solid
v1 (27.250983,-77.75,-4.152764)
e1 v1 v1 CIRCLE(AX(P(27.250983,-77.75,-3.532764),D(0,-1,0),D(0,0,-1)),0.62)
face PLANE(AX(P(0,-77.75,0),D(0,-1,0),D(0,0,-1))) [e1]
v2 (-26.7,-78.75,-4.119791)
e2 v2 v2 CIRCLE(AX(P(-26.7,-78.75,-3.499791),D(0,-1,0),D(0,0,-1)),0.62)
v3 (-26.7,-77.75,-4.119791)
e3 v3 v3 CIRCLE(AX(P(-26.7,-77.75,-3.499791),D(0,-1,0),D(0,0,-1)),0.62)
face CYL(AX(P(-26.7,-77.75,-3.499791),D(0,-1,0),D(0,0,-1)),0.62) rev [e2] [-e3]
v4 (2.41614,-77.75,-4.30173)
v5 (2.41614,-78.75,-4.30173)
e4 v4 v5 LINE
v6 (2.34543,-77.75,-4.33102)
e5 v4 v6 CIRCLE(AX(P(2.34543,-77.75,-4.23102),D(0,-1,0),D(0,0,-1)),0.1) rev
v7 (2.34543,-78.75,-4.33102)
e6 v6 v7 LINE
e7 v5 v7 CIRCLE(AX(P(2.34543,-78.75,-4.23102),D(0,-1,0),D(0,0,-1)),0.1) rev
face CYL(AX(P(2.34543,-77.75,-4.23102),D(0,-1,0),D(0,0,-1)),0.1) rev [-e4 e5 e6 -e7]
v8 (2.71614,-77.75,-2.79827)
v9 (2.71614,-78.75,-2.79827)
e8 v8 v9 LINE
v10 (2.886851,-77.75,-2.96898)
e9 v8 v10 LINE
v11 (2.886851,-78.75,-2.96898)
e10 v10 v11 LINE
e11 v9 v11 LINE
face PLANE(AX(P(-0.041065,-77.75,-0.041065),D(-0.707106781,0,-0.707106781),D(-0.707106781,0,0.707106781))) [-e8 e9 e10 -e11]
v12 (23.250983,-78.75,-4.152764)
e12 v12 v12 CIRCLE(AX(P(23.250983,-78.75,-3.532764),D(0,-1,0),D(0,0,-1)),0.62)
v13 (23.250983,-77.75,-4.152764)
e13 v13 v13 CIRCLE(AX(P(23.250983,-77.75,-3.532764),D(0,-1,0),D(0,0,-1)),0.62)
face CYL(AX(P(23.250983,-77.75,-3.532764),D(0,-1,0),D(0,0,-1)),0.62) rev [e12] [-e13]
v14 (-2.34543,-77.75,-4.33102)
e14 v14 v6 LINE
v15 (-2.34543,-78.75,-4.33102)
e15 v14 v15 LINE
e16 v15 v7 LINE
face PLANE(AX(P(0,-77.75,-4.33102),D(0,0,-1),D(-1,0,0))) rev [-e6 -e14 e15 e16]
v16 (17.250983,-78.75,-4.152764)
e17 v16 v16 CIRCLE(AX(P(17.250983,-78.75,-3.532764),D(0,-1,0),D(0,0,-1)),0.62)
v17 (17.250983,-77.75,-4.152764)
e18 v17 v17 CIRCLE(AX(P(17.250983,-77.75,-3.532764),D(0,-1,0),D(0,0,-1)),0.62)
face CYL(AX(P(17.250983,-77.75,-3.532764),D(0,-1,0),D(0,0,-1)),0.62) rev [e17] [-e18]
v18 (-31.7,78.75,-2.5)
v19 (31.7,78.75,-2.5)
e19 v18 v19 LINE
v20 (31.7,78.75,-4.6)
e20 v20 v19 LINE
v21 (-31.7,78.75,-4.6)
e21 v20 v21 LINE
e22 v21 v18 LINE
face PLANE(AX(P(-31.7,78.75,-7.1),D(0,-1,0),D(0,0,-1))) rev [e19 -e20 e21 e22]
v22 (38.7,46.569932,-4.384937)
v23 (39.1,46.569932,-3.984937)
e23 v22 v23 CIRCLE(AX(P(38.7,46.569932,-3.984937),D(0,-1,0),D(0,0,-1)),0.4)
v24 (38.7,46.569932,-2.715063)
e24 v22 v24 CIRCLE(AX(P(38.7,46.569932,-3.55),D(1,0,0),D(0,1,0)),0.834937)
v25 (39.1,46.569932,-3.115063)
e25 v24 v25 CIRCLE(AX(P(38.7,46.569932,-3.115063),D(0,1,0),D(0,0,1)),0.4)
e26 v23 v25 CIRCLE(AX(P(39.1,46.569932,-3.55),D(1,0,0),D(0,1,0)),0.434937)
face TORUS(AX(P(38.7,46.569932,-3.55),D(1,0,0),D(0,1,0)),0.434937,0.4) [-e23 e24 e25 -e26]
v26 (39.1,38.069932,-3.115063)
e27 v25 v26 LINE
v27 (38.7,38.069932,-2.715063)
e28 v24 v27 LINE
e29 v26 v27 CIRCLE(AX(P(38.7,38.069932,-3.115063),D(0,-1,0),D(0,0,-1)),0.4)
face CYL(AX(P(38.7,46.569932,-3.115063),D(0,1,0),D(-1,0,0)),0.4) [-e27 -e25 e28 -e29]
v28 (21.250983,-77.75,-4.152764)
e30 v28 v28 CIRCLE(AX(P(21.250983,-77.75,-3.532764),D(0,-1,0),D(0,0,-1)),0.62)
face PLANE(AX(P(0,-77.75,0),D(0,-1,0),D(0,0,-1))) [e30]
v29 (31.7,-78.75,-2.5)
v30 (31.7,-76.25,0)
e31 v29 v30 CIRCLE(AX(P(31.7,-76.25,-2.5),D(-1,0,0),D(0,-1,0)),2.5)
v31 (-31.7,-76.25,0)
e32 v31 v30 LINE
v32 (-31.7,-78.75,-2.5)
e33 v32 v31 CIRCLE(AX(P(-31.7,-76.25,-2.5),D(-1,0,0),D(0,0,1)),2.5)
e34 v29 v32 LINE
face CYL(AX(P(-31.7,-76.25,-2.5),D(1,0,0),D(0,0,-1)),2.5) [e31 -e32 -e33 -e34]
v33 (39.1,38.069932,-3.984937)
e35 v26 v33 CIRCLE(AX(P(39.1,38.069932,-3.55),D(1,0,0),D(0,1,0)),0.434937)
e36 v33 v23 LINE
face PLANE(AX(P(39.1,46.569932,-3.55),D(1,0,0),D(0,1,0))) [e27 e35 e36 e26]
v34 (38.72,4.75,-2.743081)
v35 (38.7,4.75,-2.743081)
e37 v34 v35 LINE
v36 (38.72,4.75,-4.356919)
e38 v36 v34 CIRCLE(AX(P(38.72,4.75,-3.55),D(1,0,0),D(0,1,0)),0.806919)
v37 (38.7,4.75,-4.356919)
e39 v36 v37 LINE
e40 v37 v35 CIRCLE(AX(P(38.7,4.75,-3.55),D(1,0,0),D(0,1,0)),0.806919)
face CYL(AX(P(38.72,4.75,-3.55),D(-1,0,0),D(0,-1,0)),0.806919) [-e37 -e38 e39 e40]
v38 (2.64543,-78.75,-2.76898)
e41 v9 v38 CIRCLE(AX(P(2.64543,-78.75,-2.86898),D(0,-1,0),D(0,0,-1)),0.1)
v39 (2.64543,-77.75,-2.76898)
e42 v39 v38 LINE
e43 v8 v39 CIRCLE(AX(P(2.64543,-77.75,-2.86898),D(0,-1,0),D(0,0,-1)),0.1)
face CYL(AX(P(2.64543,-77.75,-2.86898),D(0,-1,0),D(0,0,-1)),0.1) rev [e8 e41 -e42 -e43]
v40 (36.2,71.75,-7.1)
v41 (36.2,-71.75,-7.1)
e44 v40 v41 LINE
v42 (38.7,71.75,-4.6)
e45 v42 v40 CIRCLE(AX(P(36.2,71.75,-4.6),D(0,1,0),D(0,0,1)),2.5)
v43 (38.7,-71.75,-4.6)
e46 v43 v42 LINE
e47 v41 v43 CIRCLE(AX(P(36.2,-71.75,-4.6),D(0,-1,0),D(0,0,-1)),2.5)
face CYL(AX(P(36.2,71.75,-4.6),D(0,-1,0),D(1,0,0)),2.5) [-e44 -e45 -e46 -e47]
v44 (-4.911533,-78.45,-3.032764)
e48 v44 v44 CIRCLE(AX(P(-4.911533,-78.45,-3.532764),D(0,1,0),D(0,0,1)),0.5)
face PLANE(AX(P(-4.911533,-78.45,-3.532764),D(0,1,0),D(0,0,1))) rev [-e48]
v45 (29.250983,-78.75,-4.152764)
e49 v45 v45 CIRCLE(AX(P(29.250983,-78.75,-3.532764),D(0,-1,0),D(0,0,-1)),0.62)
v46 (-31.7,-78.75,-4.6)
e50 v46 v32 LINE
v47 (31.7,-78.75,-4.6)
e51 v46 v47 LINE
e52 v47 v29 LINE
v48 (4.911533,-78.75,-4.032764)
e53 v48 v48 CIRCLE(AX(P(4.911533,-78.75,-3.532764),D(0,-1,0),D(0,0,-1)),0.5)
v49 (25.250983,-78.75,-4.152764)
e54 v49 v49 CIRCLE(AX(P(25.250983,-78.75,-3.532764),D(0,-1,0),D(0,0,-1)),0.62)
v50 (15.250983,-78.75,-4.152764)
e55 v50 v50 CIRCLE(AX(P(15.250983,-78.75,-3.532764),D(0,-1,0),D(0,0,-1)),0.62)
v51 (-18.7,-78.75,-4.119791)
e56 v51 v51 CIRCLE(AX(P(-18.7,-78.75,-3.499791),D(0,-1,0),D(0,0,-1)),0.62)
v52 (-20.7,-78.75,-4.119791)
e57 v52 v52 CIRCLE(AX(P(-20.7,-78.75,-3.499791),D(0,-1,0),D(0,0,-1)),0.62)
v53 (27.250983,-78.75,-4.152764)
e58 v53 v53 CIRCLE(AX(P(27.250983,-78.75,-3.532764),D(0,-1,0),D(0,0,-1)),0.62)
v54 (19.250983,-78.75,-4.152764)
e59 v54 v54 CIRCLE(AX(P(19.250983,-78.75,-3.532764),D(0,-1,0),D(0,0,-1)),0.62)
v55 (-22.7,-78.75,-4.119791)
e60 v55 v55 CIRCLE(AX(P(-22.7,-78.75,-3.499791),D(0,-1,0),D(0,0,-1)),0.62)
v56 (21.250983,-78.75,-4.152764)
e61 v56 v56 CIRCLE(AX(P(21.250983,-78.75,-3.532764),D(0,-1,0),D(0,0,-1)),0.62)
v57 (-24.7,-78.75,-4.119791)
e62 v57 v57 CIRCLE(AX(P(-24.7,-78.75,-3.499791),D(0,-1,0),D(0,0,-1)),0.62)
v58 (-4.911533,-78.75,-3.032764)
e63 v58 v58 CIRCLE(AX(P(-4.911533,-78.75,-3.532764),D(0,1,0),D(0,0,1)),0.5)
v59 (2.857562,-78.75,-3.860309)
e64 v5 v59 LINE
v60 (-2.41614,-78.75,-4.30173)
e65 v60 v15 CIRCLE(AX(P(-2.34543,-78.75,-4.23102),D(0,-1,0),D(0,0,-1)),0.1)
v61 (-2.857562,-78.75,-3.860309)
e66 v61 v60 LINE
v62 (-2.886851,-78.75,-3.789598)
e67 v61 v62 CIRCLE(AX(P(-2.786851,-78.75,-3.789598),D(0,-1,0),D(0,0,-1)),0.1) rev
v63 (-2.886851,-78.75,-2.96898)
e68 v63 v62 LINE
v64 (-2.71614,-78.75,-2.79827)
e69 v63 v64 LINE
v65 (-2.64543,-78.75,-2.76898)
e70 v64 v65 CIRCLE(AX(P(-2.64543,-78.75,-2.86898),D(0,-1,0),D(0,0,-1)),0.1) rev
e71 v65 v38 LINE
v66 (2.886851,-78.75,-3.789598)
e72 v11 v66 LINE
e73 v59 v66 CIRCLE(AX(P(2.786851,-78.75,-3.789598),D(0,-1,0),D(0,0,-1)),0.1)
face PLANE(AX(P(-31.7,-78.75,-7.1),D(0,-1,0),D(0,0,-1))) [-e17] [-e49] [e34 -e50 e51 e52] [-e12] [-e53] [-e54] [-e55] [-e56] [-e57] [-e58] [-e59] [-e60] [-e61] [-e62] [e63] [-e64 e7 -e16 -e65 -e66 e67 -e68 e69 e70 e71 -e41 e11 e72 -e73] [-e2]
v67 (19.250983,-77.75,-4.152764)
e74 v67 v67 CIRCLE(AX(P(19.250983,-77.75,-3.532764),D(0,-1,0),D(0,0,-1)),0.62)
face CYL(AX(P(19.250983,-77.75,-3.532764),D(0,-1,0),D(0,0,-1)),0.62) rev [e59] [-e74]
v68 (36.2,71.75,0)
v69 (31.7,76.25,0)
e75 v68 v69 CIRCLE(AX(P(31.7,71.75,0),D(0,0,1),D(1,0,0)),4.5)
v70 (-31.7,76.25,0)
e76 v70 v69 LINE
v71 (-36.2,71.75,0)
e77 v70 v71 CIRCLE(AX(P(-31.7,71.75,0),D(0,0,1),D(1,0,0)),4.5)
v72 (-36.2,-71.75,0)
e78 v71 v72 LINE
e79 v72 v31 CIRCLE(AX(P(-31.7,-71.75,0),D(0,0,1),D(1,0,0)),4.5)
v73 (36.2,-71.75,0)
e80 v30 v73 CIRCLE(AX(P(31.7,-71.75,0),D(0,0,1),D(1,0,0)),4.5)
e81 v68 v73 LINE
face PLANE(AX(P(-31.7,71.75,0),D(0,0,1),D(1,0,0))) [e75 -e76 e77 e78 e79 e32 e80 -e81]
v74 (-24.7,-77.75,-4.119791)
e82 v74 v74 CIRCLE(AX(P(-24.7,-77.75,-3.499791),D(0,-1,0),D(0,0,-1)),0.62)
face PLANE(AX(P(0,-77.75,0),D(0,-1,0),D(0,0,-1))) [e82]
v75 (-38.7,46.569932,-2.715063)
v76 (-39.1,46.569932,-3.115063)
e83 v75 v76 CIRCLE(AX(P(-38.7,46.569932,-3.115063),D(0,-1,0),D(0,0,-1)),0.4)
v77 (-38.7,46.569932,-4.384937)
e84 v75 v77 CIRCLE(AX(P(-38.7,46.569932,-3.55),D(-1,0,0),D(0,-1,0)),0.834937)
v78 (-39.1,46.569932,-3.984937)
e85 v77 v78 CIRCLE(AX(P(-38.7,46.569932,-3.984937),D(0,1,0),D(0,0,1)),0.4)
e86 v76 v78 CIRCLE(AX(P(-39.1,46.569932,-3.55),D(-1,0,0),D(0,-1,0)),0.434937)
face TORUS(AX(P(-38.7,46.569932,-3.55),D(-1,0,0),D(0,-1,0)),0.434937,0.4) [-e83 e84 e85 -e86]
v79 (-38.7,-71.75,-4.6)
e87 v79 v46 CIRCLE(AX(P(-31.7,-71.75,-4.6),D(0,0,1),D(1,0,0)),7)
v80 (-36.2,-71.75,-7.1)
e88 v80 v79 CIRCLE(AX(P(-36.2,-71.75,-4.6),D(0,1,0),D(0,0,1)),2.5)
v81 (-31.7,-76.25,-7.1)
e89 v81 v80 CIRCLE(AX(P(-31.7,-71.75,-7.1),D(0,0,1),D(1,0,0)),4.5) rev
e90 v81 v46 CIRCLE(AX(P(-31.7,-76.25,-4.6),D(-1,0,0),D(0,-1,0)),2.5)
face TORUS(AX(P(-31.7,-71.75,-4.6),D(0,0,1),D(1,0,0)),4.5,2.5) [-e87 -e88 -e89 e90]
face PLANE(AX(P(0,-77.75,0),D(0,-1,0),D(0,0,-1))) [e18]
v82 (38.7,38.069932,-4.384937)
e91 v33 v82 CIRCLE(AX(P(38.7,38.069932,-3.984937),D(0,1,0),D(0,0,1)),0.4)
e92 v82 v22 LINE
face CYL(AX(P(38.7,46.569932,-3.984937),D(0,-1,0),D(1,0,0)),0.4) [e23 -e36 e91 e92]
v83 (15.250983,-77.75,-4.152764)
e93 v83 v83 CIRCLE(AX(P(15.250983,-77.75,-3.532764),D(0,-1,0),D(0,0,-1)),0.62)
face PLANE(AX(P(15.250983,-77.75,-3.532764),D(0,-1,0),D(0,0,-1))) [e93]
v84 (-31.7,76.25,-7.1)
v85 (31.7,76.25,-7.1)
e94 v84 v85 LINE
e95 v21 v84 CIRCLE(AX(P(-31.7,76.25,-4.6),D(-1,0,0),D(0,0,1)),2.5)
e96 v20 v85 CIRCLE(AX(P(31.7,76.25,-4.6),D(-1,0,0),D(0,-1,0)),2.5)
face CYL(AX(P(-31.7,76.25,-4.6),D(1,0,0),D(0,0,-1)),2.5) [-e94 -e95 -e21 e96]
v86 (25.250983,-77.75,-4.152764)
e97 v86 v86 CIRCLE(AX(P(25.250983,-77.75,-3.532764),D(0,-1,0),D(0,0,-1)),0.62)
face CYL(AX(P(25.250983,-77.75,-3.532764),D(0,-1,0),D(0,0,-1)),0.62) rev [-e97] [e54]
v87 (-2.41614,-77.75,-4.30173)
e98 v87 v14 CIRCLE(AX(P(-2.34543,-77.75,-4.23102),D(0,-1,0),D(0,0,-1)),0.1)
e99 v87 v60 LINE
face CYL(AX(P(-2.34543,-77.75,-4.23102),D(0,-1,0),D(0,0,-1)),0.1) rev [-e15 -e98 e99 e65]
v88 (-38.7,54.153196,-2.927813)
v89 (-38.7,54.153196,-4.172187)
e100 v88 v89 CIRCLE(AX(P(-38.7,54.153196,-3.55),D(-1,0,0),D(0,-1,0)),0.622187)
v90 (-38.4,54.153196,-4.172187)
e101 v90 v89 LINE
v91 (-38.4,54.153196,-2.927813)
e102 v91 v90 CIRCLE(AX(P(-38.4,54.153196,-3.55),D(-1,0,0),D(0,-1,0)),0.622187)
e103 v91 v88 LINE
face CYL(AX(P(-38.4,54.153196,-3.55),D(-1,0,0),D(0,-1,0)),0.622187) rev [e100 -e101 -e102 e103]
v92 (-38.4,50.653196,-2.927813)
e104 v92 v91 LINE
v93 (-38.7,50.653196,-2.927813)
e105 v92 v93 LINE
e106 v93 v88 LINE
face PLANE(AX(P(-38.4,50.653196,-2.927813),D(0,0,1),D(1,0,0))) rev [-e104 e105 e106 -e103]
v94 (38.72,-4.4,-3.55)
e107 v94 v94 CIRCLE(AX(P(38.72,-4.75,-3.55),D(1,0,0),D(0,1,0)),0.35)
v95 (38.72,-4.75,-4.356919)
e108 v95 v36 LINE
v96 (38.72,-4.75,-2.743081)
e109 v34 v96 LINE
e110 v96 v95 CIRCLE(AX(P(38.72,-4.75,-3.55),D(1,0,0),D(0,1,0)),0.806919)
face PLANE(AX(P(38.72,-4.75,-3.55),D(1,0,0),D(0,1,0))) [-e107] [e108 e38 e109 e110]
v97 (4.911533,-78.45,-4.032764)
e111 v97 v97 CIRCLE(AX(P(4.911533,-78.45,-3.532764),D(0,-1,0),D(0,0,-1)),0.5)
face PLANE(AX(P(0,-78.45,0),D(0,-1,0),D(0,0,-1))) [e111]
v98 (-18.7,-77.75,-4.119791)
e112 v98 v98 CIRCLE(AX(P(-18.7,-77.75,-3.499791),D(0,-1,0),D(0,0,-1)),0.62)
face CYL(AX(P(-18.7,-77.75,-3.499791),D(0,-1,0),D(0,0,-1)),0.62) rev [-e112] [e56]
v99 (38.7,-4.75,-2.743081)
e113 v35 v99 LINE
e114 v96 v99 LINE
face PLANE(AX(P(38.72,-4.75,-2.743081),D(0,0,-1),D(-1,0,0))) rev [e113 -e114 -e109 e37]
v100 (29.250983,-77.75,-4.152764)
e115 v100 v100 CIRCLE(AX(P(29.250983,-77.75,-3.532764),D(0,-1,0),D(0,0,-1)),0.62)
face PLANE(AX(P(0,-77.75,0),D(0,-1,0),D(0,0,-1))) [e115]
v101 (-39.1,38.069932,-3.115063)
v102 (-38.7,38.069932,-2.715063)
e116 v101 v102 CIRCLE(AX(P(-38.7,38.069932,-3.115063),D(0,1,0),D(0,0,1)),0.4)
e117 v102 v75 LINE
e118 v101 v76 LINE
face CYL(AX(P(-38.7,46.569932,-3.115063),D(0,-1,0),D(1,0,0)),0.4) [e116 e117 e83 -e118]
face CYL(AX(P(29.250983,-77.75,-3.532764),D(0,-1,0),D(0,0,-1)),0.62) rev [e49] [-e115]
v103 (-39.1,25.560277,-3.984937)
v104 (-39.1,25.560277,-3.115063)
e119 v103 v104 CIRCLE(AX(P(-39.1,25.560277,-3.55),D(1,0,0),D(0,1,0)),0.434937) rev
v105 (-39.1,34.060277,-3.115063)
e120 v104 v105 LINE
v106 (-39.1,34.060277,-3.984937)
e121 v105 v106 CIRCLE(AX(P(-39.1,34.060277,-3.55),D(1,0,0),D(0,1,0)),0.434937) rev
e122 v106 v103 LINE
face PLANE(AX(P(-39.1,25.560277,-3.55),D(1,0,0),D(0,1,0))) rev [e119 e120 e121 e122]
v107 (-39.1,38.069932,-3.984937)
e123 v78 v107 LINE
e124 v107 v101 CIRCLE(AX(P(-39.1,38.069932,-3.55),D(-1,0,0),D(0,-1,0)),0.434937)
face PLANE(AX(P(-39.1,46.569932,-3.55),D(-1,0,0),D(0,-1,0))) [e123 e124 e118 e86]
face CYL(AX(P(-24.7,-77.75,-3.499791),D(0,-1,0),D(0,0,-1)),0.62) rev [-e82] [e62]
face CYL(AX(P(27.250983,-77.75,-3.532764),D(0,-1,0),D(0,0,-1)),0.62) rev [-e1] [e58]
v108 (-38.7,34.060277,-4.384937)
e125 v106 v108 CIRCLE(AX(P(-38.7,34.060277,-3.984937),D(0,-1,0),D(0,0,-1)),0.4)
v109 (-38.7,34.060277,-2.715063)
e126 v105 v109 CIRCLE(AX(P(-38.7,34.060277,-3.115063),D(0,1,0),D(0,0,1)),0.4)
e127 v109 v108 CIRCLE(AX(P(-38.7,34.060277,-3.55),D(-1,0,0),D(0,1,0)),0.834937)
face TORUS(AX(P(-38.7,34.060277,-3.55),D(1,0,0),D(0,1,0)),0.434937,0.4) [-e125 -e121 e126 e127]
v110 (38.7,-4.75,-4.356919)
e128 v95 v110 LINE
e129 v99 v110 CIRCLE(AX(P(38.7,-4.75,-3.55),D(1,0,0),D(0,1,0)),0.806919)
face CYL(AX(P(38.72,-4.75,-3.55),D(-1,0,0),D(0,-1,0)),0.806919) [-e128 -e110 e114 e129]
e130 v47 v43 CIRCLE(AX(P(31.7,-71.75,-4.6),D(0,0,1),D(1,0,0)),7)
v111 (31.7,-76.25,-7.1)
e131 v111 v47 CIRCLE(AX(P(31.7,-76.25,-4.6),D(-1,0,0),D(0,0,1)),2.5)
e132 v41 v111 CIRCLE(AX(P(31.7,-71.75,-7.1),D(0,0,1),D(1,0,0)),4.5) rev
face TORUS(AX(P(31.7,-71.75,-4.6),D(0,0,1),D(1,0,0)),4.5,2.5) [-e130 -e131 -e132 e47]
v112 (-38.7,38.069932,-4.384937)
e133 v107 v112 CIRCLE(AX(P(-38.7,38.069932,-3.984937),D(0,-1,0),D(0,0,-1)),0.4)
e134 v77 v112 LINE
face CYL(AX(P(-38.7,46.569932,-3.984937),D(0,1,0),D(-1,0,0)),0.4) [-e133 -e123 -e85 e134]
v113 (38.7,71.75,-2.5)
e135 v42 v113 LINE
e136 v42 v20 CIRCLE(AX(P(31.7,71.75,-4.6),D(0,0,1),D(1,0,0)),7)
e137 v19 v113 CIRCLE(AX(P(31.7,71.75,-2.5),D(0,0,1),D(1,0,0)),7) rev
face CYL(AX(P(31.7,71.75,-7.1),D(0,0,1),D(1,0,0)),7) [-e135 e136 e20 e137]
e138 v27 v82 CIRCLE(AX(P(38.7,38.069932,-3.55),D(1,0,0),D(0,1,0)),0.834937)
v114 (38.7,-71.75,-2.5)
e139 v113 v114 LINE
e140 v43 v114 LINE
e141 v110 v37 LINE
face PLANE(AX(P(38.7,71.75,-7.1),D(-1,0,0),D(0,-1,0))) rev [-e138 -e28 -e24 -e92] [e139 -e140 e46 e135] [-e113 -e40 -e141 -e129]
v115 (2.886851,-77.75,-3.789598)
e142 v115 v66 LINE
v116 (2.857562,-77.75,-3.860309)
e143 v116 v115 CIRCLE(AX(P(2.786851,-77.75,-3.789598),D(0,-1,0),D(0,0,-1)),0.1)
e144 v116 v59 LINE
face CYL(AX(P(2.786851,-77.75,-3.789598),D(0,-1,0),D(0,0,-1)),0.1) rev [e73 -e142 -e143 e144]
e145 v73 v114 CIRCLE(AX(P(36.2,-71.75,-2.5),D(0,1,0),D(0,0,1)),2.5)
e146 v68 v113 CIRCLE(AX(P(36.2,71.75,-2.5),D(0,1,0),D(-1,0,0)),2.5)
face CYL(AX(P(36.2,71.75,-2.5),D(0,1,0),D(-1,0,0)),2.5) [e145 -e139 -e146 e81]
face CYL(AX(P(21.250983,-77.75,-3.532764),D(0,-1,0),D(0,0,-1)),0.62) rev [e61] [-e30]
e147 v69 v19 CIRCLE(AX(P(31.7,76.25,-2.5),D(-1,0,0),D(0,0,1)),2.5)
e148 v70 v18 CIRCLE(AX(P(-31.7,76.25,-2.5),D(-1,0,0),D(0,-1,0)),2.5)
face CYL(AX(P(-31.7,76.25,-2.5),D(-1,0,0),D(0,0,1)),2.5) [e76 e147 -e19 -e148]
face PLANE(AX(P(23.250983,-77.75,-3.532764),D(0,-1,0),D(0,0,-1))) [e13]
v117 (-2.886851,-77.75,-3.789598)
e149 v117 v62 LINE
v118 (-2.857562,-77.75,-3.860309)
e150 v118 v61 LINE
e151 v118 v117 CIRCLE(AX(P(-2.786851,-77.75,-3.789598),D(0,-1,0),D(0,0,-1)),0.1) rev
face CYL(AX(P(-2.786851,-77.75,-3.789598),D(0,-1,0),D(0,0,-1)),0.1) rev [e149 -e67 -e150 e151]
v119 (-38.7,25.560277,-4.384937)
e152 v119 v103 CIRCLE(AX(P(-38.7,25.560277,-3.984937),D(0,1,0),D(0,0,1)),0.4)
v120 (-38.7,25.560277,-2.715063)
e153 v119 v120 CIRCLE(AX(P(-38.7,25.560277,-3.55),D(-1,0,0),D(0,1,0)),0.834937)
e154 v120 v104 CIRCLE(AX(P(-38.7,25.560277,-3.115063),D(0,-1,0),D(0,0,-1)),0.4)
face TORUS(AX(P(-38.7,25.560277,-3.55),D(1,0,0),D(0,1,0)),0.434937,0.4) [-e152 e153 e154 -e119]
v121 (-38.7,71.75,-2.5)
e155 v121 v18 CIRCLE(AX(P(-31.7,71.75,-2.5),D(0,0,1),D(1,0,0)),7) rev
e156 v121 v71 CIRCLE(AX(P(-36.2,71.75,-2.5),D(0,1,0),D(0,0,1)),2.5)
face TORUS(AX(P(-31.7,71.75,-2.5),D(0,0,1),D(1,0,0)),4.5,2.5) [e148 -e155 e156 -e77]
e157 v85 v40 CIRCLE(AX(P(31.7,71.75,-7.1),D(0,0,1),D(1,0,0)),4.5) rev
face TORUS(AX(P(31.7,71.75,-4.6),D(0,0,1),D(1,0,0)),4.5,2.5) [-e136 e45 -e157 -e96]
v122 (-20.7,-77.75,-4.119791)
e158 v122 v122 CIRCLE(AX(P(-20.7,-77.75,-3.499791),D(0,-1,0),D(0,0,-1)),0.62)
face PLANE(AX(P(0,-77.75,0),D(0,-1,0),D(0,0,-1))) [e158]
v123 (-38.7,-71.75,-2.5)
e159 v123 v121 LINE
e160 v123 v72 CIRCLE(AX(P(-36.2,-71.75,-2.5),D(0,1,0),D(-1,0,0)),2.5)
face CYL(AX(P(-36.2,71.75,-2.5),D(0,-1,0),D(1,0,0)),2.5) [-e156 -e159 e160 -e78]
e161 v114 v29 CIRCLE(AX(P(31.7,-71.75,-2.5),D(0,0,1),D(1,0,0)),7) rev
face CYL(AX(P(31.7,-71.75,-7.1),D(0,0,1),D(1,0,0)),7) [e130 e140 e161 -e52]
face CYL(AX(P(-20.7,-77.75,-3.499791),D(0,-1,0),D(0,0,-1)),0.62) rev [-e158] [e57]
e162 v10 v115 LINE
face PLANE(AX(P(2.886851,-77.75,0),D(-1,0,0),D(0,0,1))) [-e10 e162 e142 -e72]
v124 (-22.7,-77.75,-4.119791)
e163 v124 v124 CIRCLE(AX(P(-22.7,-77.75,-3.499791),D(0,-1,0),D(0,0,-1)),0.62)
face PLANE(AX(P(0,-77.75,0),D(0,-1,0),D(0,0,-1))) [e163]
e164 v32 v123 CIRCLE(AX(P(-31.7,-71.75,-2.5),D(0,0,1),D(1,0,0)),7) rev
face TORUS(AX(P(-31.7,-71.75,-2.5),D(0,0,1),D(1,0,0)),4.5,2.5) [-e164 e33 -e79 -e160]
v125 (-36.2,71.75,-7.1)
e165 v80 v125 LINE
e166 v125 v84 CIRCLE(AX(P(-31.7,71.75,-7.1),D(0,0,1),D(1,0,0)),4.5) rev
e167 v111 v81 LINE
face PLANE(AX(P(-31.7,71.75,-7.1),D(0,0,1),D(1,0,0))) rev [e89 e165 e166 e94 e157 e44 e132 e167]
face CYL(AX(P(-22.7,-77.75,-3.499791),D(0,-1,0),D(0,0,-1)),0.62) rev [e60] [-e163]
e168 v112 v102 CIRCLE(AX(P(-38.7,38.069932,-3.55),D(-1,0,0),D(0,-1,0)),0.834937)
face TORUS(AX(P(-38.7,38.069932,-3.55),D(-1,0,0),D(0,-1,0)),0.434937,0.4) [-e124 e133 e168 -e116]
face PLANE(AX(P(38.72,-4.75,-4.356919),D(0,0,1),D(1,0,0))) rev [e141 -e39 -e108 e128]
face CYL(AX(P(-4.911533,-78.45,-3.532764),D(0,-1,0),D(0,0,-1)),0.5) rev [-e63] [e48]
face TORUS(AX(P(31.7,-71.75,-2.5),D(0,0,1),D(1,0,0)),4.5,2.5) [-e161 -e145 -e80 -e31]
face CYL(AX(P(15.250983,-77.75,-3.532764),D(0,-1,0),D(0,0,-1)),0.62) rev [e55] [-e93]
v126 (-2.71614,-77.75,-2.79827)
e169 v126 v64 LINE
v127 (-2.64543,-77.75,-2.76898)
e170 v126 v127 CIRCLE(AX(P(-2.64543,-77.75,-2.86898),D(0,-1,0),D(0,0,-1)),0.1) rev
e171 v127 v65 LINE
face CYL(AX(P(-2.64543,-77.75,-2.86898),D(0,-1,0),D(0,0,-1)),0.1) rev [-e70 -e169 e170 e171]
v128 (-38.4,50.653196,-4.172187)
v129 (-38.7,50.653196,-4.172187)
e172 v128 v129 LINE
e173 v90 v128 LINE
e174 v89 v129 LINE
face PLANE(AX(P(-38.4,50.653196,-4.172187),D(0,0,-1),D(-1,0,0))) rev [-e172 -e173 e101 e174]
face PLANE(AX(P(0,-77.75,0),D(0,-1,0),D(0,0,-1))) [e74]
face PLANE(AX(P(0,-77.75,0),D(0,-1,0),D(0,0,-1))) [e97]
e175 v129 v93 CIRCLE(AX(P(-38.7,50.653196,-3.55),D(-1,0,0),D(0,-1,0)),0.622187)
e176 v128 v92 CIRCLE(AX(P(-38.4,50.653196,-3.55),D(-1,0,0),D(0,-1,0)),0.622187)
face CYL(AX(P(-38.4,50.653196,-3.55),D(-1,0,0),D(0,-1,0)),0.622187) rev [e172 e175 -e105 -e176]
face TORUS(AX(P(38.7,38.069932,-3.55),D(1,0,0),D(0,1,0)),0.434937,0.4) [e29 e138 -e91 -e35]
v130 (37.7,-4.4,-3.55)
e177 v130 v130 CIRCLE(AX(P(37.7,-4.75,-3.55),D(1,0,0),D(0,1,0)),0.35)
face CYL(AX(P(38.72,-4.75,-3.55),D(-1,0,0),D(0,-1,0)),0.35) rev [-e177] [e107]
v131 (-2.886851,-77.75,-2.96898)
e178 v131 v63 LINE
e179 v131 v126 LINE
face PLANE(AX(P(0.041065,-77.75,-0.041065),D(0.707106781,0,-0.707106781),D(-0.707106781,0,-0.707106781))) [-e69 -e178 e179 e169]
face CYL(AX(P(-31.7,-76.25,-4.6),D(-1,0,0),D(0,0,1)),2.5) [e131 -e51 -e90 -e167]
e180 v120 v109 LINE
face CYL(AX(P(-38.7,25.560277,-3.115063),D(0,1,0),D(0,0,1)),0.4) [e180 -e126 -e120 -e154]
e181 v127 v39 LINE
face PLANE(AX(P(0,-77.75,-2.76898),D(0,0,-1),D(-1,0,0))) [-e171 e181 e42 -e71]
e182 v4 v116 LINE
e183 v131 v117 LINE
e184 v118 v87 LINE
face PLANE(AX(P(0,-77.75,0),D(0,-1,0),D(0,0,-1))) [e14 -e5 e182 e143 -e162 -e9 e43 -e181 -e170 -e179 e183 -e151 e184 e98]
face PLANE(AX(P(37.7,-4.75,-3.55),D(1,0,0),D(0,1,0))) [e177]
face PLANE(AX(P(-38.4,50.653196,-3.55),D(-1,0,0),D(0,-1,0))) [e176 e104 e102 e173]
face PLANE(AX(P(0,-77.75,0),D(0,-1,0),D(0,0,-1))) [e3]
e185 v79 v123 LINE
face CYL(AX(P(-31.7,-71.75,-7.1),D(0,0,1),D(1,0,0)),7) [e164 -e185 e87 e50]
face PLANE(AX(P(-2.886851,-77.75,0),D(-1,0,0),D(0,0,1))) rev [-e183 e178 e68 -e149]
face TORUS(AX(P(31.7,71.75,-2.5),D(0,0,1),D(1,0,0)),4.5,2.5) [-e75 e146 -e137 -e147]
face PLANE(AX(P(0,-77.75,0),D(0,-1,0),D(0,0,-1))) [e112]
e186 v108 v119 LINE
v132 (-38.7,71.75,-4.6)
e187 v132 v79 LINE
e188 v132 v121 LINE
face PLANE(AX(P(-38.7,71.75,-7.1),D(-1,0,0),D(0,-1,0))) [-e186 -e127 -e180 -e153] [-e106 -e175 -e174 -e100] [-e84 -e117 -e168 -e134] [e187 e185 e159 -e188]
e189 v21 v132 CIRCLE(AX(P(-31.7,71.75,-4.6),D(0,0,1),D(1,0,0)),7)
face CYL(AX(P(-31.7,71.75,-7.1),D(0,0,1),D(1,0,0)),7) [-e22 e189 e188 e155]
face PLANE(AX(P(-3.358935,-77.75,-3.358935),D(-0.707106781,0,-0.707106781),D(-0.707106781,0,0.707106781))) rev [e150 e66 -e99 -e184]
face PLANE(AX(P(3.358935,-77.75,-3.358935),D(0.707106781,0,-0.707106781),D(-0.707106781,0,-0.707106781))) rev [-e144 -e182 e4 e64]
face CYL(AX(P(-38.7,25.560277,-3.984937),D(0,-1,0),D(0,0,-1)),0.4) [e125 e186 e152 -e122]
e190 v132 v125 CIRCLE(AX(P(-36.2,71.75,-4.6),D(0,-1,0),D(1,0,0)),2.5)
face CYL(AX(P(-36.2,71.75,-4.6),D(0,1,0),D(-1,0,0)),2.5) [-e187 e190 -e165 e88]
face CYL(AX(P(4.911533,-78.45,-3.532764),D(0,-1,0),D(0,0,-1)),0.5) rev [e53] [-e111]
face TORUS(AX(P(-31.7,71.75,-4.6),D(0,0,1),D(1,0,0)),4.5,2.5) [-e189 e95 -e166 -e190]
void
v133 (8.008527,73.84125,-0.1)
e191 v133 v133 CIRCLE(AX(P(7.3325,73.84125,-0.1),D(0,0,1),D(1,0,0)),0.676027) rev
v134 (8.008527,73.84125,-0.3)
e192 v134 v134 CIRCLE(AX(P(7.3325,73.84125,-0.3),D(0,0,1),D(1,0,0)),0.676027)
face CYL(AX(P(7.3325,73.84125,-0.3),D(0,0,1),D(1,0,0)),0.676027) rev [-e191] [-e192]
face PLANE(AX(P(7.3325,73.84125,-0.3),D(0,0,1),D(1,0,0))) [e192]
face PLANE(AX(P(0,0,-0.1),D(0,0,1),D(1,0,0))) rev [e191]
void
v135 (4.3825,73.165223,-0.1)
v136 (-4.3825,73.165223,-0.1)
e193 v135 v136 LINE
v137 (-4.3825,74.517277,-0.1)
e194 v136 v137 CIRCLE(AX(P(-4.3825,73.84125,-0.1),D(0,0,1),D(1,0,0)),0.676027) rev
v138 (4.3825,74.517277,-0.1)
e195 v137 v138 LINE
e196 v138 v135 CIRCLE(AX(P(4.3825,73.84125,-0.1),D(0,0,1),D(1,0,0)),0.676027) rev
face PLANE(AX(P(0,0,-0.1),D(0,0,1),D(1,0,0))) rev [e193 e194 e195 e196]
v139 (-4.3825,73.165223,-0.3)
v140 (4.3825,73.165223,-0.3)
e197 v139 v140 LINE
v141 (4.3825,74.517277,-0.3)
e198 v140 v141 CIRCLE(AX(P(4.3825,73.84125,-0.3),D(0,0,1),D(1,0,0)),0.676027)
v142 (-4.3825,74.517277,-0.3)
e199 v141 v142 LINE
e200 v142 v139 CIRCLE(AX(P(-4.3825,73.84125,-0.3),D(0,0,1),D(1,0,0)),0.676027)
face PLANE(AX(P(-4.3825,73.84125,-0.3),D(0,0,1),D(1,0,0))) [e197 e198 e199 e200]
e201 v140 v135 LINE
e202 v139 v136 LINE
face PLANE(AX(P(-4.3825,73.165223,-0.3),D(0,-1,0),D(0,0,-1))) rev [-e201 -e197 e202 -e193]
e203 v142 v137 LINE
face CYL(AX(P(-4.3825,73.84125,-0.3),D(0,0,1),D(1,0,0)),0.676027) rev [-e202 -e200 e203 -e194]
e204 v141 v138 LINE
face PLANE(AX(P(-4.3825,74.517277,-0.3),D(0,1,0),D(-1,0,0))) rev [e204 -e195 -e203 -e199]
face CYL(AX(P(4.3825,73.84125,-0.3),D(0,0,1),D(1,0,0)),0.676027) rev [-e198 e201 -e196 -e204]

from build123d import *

# Parameters (mm, degrees)
BOSS_EXTRUDE1_DEPTH = 7.1
CUT_EXTRUDE1_DEPTH  = 0.1
FILLET1_R           = 2.5
SKETCH2_R           = 0.676027343
CUT_EXTRUDE3_DEPTH  = 0.3
BOSS_EXTRUDE3_DEPTH = 0.4
FILLET3_R           = 0.4
SKETCH5_R           = 0.35
BOSS_EXTRUDE4_DEPTH = 0.02
CUT_EXTRUDE4_START  = -1
SKETCH6_R           = 0.35
CUT_EXTRUDE4_DEPTH  = 1
BOSS_EXTRUDE5_START = 0.4
BOSS_EXTRUDE5_DEPTH = 0.4
FILLET4_R           = 0.4
CUT_EXTRUDE5_DEPTH  = 0.3
SKETCH10_R          = 0.62
CUT_EXTRUDE6_DEPTH  = 1
SKETCH10_3_R        = 0.5
CUT_EXTRUDE7_DEPTH  = 0.3
BOSS_EXTRUDE6_START = 0.1
BOSS_EXTRUDE6_DEPTH = 0.1


with BuildPart() as part:
    # Sketch1 → Boss-Extrude1 (new body)
    with BuildSketch(Plane.XY):
        with BuildLine():
            Line((-31.7, 78.75), (31.7, 78.75))
            ThreePointArc((31.7, 78.75), (36.649747468, 76.699747468), (38.7, 71.75))
            Line((38.7, 71.75), (38.7, -71.75))
            ThreePointArc((38.7, -71.75), (36.649747468, -76.699747468), (31.7, -78.75))
            Line((31.7, -78.75), (-31.7, -78.75))
            ThreePointArc((-31.7, -78.75), (-36.649747468, -76.699747468), (-38.7, -71.75))
            Line((-38.7, -71.75), (-38.7, 71.75))
            ThreePointArc((-38.7, 71.75), (-36.649747468, 76.699747468), (-31.7, 78.75))
        make_face()
    extrude(amount=-BOSS_EXTRUDE1_DEPTH)

    # Sketch1<3> → Cut-Extrude1 (cut)
    with BuildSketch(Plane.XY):
        with BuildLine():
            Line((-36.2, 71.25), (-36.2, -71.25))
            ThreePointArc((-36.2, -71.25), (-34.735533906, -74.785533906), (-31.2, -76.25))
            Line((-31.2, -76.25), (31.2, -76.25))
            ThreePointArc((31.2, -76.25), (34.735533906, -74.785533906), (36.2, -71.25))
            Line((36.2, -71.25), (36.2, 71.25))
            ThreePointArc((36.2, 71.25), (34.735533906, 74.785533906), (31.2, 76.25))
            Line((31.2, 76.25), (22.375, 76.25))
            ThreePointArc((22.375, 76.25), (22.021446609, 76.103553391), (21.875, 75.75))
            Line((21.875, 75.75), (21.875, 74.4325))
            ThreePointArc((21.875, 74.4325), (20.996320344, 72.311179656), (18.875, 71.4325))
            Line((18.875, 71.4325), (-18.875, 71.4325))
            ThreePointArc((-18.875, 71.4325), (-20.996320344, 72.311179656), (-21.875, 74.4325))
            Line((-21.875, 74.4325), (-21.875, 75.75))
            ThreePointArc((-21.875, 75.75), (-22.021446609, 76.103553391), (-22.375, 76.25))
            Line((-22.375, 76.25), (-31.2, 76.25))
            ThreePointArc((-31.2, 76.25), (-34.735533906, 74.785533906), (-36.2, 71.25))
        make_face()
    extrude(amount=-CUT_EXTRUDE1_DEPTH, mode=Mode.SUBTRACT)

    # Fillet1
    fillet1_edges = [part.edges().sort_by_distance(p)[0] for p in [
        (0, -78.75, 0),
        (-36.649747468, -76.699747468, 0),
        (-38.7, 0, 0),
        (-36.649747468, 76.699747468, 0),
        (-36.649747468, -76.699747468, -7.1),
        (0, -78.75, -7.1),
        (36.649747468, -76.699747468, -7.1),
        (38.7, 0, -7.1),
        (36.649747468, 76.699747468, -7.1),
        (0, 78.75, -7.1),
        (-36.649747468, 76.699747468, -7.1),
        (0, 78.75, 0),
        (-38.7, 0, -7.1),
        (36.649747468, 76.699747468, 0),
        (38.7, 0, 0),
        (36.649747468, -76.699747468, 0),
    ]]
    fillet(fillet1_edges, radius=FILLET1_R - 0.0001)  # a hair under: the kernel refuses the full size

    # Sketch2 → Cut-Extrude3 (cut)
    with BuildSketch(Plane.XY):
        with Locations((7.3325, 73.84125)):
            Circle(SKETCH2_R)
        with BuildLine():
            Line((-4.3825, 74.517277343), (4.3825, 74.517277343))
            ThreePointArc((4.3825, 74.517277343), (5.058527343, 73.84125), (4.3825, 73.165222657))
            Line((4.3825, 73.165222657), (-4.3825, 73.165222657))
            ThreePointArc((-4.3825, 73.165222657), (-5.058527343, 73.84125), (-4.3825, 74.517277343))
        make_face()
    extrude(amount=-CUT_EXTRUDE3_DEPTH, mode=Mode.SUBTRACT)

    # Sketch4 → Boss-Extrude3 (add)
    with BuildSketch(Plane(origin=(38.7, 0, 0), x_dir=(0, 0, -1), z_dir=(1, 0, 0))):
        with BuildLine():
            Line((4.384936965, 46.569932164), (4.384936965, 38.069932164))
            ThreePointArc((4.384936965, 38.069932164), (3.55, 37.234995199), (2.715063035, 38.069932164))
            Line((2.715063035, 38.069932164), (2.715063035, 46.569932164))
            ThreePointArc((2.715063035, 46.569932164), (3.55, 47.404869129), (4.384936965, 46.569932164))
        make_face()
    extrude(amount=BOSS_EXTRUDE3_DEPTH)

    # Fillet3
    fillet3_edges = [part.edges().sort_by_distance(p)[0] for p in [
        (39.1, 42.319932164, -4.384936965),
        (39.1, 37.234995199, -3.55),
        (39.1, 42.319932164, -2.715063035),
        (39.1, 47.404869129, -3.55),
    ]]
    fillet(fillet3_edges, radius=FILLET3_R - 0.0001)  # a hair under: the kernel refuses the full size

    # Sketch5 → Boss-Extrude4 (add)
    with BuildSketch(Plane(origin=(38.7, 0, 0), x_dir=(0, 0, -1), z_dir=(1, 0, 0))):
        with BuildLine():
            Line((2.743081149, -4.75), (2.743081149, 4.75))
            ThreePointArc((2.743081149, 4.75), (3.55, 5.556918851), (4.356918851, 4.75))
            Line((4.356918851, 4.75), (4.356918851, -4.75))
            ThreePointArc((4.356918851, -4.75), (3.55, -5.556918851), (2.743081149, -4.75))
        make_face()
        with Locations(Location((3.55, -4.75, 0), (0, 0, 90))):
            Circle(SKETCH5_R, mode=Mode.SUBTRACT)
    extrude(amount=BOSS_EXTRUDE4_DEPTH)

    # Sketch6 → Cut-Extrude4 (cut)
    with BuildSketch(Plane(origin=(38.7, 0, 0), x_dir=(0, 0, -1), z_dir=(1, 0, 0)).offset(CUT_EXTRUDE4_START)):
        with Locations(Location((3.55, -4.75, 0), (0, 0, 90))):
            Circle(SKETCH6_R)
    extrude(amount=CUT_EXTRUDE4_DEPTH, mode=Mode.SUBTRACT)

    # Sketch7 → Boss-Extrude5 (add)
    with BuildSketch(Plane.ZY.offset(38.7).offset(BOSS_EXTRUDE5_START)):
        with BuildLine():
            Line((-2.715063035, 46.569932164), (-2.715063035, 38.069932164))
            ThreePointArc((-2.715063035, 38.069932164), (-3.55, 37.234995199), (-4.384936965, 38.069932164))
            Line((-4.384936965, 38.069932164), (-4.384936965, 46.569932164))
            ThreePointArc((-4.384936965, 46.569932164), (-3.55, 47.404869129), (-2.715063035, 46.569932164))
        make_face()
        with BuildLine():
            Line((-4.384936965, 34.060277107), (-4.384936965, 25.560277107))
            ThreePointArc((-4.384936965, 25.560277107), (-3.55, 24.725340142), (-2.715063035, 25.560277107))
            Line((-2.715063035, 25.560277107), (-2.715063035, 34.060277107))
            ThreePointArc((-2.715063035, 34.060277107), (-3.55, 34.895214071), (-4.384936965, 34.060277107))
        make_face()
    extrude(amount=-BOSS_EXTRUDE5_DEPTH)

    # Fillet4
    fillet4_edges = [part.edges().sort_by_distance(p)[0] for p in [
        (-39.1, 29.810277107, -4.384936965),
        (-39.1, 34.895214071, -3.55),
        (-39.1, 29.810277107, -2.715063035),
        (-39.1, 24.725340142, -3.55),
        (-39.1, 42.319932164, -2.715063035),
        (-39.1, 37.234995199, -3.55),
        (-39.1, 42.319932164, -4.384936965),
        (-39.1, 47.404869129, -3.55),
    ]]
    fillet(fillet4_edges, radius=FILLET4_R - 0.0001)  # a hair under: the kernel refuses the full size

    # Sketch8 → Cut-Extrude5 (cut)
    with BuildSketch(Plane.ZY.offset(38.7)):
        with BuildLine():
            Line((-4.172186762, 50.653196256), (-4.172186762, 54.153196256))
            ThreePointArc((-4.172186762, 54.153196256), (-3.55, 54.775383019), (-2.927813238, 54.153196256))
            Line((-2.927813238, 54.153196256), (-2.927813238, 50.653196256))
            ThreePointArc((-2.927813238, 50.653196256), (-3.55, 50.031009494), (-4.172186762, 50.653196256))
        make_face()
    extrude(amount=-CUT_EXTRUDE5_DEPTH, mode=Mode.SUBTRACT)

    # Sketch10 → Cut-Extrude6 (cut)
    with BuildSketch(Plane.XZ.offset(78.75)):
        with Locations(Location((-26.7, -3.499791078, 0), (0, 0, 270))):
            Circle(SKETCH10_R)
        with Locations(Location((-24.7, -3.499791078, 0), (0, 0, 270))):
            Circle(SKETCH10_R)
        with Locations(Location((-22.7, -3.499791078, 0), (0, 0, 270))):
            Circle(SKETCH10_R)
        with Locations(Location((-20.7, -3.499791078, 0), (0, 0, 270))):
            Circle(SKETCH10_R)
        with Locations(Location((-18.7, -3.499791078, 0), (0, 0, 270))):
            Circle(SKETCH10_R)
        with BuildLine():
            ThreePointArc((2.416140334, -4.301730287), (2.383697999, -4.323407562), (2.345429656, -4.331019608))
            Line((2.345429656, -4.331019608), (-2.345429656, -4.331019608))
            ThreePointArc((-2.345429656, -4.331019608), (-2.383697999, -4.323407562), (-2.416140334, -4.301730287))
            Line((-2.416140334, -4.301730287), (-2.85756169, -3.86030893))
            ThreePointArc((-2.85756169, -3.86030893), (-2.879238965, -3.827866595), (-2.886851012, -3.789598252))
            Line((-2.886851012, -3.789598252), (-2.886851012, -2.968980392))
            Line((-2.886851012, -2.968980392), (-2.716140334, -2.798269713))
            ThreePointArc((-2.716140334, -2.798269713), (-2.683697999, -2.776592438), (-2.645429656, -2.768980392))
            Line((-2.645429656, -2.768980392), (2.645429656, -2.768980392))
            ThreePointArc((2.645429656, -2.768980392), (2.683697999, -2.776592438), (2.716140334, -2.798269713))
            Line((2.716140334, -2.798269713), (2.886851012, -2.968980392))
            Line((2.886851012, -2.968980392), (2.886851012, -3.789598252))
            ThreePointArc((2.886851012, -3.789598252), (2.879238965, -3.827866595), (2.85756169, -3.86030893))
            Line((2.85756169, -3.86030893), (2.416140334, -4.301730287))
        make_face()
        with Locations(Location((17.250983068, -3.532763518, 0), (0, 0, 270))):
            Circle(SKETCH10_R)
        with Locations(Location((19.250983068, -3.532763518, 0), (0, 0, 270))):
            Circle(SKETCH10_R)
        with Locations(Location((21.250983068, -3.532763518, 0), (0, 0, 270))):
            Circle(SKETCH10_R)
        with Locations(Location((25.250983068, -3.532763518, 0), (0, 0, 270))):
            Circle(SKETCH10_R)
        with Locations(Location((29.250983068, -3.532763518, 0), (0, 0, 270))):
            Circle(SKETCH10_R)
        with Locations(Location((27.250983068, -3.532763518, 0), (0, 0, 270))):
            Circle(SKETCH10_R)
        with Locations(Location((15.250983068, -3.532763518, 0), (0, 0, 270))):
            Circle(SKETCH10_R)
        with Locations(Location((23.250983068, -3.532763518, 0), (0, 0, 270))):
            Circle(SKETCH10_R)
    extrude(amount=-CUT_EXTRUDE6_DEPTH, mode=Mode.SUBTRACT)

    # Sketch10<3> → Cut-Extrude7 (cut)
    with BuildSketch(Plane.XZ.offset(78.75)):
        with Locations(Location((4.911533441, -3.532763518, 0), (0, 0, 270))):
            Circle(SKETCH10_3_R)
        with Locations(Location((-4.911533441, -3.532763518, 0), (0, 0, 90))):
            Circle(SKETCH10_3_R)
    extrude(amount=-CUT_EXTRUDE7_DEPTH, mode=Mode.SUBTRACT)

    # Sketch12 → Boss-Extrude6 (add)
    with BuildSketch(Plane.XY.offset(-0.1).offset(BOSS_EXTRUDE6_START)):
        with BuildLine():
            Line((-22.375, 76.25), (-31.2, 76.25))
            ThreePointArc((-31.2, 76.25), (-34.735533906, 74.785533906), (-36.2, 71.25))
            Line((-36.2, 71.25), (-36.2, -71.25))
            ThreePointArc((-36.2, -71.25), (-34.735533906, -74.785533906), (-31.2, -76.25))
            Line((-31.2, -76.25), (31.2, -76.25))
            ThreePointArc((31.2, -76.25), (34.735533906, -74.785533906), (36.2, -71.25))
            Line((36.2, -71.25), (36.2, 71.25))
            ThreePointArc((36.2, 71.25), (34.735533906, 74.785533906), (31.2, 76.25))
            Line((31.2, 76.25), (22.375, 76.25))
            ThreePointArc((22.375, 76.25), (22.021446609, 76.103553391), (21.875, 75.75))
            Line((21.875, 75.75), (21.875, 74.4325))
            ThreePointArc((21.875, 74.4325), (20.996320344, 72.311179656), (18.875, 71.4325))
            Line((18.875, 71.4325), (-18.875, 71.4325))
            ThreePointArc((-18.875, 71.4325), (-20.996320344, 72.311179656), (-21.875, 74.4325))
            Line((-21.875, 74.4325), (-21.875, 75.75))
            ThreePointArc((-21.875, 75.75), (-22.021446609, 76.103553391), (-22.375, 76.25))
        make_face()
        with BuildLine():
            Line((22.375, 76.25), (-22.375, 76.25))
            ThreePointArc((-22.375, 76.25), (-22.021446609, 76.103553391), (-21.875, 75.75))
            Line((-21.875, 75.75), (-21.875, 74.4325))
            ThreePointArc((-21.875, 74.4325), (-20.996320344, 72.311179656), (-18.875, 71.4325))
            Line((-18.875, 71.4325), (18.875, 71.4325))
            ThreePointArc((18.875, 71.4325), (20.996320344, 72.311179656), (21.875, 74.4325))
            Line((21.875, 74.4325), (21.875, 75.75))
            ThreePointArc((21.875, 75.75), (22.021446609, 76.103553391), (22.375, 76.25))
        make_face()
    extrude(amount=-BOSS_EXTRUDE6_DEPTH)


solid = part.part
